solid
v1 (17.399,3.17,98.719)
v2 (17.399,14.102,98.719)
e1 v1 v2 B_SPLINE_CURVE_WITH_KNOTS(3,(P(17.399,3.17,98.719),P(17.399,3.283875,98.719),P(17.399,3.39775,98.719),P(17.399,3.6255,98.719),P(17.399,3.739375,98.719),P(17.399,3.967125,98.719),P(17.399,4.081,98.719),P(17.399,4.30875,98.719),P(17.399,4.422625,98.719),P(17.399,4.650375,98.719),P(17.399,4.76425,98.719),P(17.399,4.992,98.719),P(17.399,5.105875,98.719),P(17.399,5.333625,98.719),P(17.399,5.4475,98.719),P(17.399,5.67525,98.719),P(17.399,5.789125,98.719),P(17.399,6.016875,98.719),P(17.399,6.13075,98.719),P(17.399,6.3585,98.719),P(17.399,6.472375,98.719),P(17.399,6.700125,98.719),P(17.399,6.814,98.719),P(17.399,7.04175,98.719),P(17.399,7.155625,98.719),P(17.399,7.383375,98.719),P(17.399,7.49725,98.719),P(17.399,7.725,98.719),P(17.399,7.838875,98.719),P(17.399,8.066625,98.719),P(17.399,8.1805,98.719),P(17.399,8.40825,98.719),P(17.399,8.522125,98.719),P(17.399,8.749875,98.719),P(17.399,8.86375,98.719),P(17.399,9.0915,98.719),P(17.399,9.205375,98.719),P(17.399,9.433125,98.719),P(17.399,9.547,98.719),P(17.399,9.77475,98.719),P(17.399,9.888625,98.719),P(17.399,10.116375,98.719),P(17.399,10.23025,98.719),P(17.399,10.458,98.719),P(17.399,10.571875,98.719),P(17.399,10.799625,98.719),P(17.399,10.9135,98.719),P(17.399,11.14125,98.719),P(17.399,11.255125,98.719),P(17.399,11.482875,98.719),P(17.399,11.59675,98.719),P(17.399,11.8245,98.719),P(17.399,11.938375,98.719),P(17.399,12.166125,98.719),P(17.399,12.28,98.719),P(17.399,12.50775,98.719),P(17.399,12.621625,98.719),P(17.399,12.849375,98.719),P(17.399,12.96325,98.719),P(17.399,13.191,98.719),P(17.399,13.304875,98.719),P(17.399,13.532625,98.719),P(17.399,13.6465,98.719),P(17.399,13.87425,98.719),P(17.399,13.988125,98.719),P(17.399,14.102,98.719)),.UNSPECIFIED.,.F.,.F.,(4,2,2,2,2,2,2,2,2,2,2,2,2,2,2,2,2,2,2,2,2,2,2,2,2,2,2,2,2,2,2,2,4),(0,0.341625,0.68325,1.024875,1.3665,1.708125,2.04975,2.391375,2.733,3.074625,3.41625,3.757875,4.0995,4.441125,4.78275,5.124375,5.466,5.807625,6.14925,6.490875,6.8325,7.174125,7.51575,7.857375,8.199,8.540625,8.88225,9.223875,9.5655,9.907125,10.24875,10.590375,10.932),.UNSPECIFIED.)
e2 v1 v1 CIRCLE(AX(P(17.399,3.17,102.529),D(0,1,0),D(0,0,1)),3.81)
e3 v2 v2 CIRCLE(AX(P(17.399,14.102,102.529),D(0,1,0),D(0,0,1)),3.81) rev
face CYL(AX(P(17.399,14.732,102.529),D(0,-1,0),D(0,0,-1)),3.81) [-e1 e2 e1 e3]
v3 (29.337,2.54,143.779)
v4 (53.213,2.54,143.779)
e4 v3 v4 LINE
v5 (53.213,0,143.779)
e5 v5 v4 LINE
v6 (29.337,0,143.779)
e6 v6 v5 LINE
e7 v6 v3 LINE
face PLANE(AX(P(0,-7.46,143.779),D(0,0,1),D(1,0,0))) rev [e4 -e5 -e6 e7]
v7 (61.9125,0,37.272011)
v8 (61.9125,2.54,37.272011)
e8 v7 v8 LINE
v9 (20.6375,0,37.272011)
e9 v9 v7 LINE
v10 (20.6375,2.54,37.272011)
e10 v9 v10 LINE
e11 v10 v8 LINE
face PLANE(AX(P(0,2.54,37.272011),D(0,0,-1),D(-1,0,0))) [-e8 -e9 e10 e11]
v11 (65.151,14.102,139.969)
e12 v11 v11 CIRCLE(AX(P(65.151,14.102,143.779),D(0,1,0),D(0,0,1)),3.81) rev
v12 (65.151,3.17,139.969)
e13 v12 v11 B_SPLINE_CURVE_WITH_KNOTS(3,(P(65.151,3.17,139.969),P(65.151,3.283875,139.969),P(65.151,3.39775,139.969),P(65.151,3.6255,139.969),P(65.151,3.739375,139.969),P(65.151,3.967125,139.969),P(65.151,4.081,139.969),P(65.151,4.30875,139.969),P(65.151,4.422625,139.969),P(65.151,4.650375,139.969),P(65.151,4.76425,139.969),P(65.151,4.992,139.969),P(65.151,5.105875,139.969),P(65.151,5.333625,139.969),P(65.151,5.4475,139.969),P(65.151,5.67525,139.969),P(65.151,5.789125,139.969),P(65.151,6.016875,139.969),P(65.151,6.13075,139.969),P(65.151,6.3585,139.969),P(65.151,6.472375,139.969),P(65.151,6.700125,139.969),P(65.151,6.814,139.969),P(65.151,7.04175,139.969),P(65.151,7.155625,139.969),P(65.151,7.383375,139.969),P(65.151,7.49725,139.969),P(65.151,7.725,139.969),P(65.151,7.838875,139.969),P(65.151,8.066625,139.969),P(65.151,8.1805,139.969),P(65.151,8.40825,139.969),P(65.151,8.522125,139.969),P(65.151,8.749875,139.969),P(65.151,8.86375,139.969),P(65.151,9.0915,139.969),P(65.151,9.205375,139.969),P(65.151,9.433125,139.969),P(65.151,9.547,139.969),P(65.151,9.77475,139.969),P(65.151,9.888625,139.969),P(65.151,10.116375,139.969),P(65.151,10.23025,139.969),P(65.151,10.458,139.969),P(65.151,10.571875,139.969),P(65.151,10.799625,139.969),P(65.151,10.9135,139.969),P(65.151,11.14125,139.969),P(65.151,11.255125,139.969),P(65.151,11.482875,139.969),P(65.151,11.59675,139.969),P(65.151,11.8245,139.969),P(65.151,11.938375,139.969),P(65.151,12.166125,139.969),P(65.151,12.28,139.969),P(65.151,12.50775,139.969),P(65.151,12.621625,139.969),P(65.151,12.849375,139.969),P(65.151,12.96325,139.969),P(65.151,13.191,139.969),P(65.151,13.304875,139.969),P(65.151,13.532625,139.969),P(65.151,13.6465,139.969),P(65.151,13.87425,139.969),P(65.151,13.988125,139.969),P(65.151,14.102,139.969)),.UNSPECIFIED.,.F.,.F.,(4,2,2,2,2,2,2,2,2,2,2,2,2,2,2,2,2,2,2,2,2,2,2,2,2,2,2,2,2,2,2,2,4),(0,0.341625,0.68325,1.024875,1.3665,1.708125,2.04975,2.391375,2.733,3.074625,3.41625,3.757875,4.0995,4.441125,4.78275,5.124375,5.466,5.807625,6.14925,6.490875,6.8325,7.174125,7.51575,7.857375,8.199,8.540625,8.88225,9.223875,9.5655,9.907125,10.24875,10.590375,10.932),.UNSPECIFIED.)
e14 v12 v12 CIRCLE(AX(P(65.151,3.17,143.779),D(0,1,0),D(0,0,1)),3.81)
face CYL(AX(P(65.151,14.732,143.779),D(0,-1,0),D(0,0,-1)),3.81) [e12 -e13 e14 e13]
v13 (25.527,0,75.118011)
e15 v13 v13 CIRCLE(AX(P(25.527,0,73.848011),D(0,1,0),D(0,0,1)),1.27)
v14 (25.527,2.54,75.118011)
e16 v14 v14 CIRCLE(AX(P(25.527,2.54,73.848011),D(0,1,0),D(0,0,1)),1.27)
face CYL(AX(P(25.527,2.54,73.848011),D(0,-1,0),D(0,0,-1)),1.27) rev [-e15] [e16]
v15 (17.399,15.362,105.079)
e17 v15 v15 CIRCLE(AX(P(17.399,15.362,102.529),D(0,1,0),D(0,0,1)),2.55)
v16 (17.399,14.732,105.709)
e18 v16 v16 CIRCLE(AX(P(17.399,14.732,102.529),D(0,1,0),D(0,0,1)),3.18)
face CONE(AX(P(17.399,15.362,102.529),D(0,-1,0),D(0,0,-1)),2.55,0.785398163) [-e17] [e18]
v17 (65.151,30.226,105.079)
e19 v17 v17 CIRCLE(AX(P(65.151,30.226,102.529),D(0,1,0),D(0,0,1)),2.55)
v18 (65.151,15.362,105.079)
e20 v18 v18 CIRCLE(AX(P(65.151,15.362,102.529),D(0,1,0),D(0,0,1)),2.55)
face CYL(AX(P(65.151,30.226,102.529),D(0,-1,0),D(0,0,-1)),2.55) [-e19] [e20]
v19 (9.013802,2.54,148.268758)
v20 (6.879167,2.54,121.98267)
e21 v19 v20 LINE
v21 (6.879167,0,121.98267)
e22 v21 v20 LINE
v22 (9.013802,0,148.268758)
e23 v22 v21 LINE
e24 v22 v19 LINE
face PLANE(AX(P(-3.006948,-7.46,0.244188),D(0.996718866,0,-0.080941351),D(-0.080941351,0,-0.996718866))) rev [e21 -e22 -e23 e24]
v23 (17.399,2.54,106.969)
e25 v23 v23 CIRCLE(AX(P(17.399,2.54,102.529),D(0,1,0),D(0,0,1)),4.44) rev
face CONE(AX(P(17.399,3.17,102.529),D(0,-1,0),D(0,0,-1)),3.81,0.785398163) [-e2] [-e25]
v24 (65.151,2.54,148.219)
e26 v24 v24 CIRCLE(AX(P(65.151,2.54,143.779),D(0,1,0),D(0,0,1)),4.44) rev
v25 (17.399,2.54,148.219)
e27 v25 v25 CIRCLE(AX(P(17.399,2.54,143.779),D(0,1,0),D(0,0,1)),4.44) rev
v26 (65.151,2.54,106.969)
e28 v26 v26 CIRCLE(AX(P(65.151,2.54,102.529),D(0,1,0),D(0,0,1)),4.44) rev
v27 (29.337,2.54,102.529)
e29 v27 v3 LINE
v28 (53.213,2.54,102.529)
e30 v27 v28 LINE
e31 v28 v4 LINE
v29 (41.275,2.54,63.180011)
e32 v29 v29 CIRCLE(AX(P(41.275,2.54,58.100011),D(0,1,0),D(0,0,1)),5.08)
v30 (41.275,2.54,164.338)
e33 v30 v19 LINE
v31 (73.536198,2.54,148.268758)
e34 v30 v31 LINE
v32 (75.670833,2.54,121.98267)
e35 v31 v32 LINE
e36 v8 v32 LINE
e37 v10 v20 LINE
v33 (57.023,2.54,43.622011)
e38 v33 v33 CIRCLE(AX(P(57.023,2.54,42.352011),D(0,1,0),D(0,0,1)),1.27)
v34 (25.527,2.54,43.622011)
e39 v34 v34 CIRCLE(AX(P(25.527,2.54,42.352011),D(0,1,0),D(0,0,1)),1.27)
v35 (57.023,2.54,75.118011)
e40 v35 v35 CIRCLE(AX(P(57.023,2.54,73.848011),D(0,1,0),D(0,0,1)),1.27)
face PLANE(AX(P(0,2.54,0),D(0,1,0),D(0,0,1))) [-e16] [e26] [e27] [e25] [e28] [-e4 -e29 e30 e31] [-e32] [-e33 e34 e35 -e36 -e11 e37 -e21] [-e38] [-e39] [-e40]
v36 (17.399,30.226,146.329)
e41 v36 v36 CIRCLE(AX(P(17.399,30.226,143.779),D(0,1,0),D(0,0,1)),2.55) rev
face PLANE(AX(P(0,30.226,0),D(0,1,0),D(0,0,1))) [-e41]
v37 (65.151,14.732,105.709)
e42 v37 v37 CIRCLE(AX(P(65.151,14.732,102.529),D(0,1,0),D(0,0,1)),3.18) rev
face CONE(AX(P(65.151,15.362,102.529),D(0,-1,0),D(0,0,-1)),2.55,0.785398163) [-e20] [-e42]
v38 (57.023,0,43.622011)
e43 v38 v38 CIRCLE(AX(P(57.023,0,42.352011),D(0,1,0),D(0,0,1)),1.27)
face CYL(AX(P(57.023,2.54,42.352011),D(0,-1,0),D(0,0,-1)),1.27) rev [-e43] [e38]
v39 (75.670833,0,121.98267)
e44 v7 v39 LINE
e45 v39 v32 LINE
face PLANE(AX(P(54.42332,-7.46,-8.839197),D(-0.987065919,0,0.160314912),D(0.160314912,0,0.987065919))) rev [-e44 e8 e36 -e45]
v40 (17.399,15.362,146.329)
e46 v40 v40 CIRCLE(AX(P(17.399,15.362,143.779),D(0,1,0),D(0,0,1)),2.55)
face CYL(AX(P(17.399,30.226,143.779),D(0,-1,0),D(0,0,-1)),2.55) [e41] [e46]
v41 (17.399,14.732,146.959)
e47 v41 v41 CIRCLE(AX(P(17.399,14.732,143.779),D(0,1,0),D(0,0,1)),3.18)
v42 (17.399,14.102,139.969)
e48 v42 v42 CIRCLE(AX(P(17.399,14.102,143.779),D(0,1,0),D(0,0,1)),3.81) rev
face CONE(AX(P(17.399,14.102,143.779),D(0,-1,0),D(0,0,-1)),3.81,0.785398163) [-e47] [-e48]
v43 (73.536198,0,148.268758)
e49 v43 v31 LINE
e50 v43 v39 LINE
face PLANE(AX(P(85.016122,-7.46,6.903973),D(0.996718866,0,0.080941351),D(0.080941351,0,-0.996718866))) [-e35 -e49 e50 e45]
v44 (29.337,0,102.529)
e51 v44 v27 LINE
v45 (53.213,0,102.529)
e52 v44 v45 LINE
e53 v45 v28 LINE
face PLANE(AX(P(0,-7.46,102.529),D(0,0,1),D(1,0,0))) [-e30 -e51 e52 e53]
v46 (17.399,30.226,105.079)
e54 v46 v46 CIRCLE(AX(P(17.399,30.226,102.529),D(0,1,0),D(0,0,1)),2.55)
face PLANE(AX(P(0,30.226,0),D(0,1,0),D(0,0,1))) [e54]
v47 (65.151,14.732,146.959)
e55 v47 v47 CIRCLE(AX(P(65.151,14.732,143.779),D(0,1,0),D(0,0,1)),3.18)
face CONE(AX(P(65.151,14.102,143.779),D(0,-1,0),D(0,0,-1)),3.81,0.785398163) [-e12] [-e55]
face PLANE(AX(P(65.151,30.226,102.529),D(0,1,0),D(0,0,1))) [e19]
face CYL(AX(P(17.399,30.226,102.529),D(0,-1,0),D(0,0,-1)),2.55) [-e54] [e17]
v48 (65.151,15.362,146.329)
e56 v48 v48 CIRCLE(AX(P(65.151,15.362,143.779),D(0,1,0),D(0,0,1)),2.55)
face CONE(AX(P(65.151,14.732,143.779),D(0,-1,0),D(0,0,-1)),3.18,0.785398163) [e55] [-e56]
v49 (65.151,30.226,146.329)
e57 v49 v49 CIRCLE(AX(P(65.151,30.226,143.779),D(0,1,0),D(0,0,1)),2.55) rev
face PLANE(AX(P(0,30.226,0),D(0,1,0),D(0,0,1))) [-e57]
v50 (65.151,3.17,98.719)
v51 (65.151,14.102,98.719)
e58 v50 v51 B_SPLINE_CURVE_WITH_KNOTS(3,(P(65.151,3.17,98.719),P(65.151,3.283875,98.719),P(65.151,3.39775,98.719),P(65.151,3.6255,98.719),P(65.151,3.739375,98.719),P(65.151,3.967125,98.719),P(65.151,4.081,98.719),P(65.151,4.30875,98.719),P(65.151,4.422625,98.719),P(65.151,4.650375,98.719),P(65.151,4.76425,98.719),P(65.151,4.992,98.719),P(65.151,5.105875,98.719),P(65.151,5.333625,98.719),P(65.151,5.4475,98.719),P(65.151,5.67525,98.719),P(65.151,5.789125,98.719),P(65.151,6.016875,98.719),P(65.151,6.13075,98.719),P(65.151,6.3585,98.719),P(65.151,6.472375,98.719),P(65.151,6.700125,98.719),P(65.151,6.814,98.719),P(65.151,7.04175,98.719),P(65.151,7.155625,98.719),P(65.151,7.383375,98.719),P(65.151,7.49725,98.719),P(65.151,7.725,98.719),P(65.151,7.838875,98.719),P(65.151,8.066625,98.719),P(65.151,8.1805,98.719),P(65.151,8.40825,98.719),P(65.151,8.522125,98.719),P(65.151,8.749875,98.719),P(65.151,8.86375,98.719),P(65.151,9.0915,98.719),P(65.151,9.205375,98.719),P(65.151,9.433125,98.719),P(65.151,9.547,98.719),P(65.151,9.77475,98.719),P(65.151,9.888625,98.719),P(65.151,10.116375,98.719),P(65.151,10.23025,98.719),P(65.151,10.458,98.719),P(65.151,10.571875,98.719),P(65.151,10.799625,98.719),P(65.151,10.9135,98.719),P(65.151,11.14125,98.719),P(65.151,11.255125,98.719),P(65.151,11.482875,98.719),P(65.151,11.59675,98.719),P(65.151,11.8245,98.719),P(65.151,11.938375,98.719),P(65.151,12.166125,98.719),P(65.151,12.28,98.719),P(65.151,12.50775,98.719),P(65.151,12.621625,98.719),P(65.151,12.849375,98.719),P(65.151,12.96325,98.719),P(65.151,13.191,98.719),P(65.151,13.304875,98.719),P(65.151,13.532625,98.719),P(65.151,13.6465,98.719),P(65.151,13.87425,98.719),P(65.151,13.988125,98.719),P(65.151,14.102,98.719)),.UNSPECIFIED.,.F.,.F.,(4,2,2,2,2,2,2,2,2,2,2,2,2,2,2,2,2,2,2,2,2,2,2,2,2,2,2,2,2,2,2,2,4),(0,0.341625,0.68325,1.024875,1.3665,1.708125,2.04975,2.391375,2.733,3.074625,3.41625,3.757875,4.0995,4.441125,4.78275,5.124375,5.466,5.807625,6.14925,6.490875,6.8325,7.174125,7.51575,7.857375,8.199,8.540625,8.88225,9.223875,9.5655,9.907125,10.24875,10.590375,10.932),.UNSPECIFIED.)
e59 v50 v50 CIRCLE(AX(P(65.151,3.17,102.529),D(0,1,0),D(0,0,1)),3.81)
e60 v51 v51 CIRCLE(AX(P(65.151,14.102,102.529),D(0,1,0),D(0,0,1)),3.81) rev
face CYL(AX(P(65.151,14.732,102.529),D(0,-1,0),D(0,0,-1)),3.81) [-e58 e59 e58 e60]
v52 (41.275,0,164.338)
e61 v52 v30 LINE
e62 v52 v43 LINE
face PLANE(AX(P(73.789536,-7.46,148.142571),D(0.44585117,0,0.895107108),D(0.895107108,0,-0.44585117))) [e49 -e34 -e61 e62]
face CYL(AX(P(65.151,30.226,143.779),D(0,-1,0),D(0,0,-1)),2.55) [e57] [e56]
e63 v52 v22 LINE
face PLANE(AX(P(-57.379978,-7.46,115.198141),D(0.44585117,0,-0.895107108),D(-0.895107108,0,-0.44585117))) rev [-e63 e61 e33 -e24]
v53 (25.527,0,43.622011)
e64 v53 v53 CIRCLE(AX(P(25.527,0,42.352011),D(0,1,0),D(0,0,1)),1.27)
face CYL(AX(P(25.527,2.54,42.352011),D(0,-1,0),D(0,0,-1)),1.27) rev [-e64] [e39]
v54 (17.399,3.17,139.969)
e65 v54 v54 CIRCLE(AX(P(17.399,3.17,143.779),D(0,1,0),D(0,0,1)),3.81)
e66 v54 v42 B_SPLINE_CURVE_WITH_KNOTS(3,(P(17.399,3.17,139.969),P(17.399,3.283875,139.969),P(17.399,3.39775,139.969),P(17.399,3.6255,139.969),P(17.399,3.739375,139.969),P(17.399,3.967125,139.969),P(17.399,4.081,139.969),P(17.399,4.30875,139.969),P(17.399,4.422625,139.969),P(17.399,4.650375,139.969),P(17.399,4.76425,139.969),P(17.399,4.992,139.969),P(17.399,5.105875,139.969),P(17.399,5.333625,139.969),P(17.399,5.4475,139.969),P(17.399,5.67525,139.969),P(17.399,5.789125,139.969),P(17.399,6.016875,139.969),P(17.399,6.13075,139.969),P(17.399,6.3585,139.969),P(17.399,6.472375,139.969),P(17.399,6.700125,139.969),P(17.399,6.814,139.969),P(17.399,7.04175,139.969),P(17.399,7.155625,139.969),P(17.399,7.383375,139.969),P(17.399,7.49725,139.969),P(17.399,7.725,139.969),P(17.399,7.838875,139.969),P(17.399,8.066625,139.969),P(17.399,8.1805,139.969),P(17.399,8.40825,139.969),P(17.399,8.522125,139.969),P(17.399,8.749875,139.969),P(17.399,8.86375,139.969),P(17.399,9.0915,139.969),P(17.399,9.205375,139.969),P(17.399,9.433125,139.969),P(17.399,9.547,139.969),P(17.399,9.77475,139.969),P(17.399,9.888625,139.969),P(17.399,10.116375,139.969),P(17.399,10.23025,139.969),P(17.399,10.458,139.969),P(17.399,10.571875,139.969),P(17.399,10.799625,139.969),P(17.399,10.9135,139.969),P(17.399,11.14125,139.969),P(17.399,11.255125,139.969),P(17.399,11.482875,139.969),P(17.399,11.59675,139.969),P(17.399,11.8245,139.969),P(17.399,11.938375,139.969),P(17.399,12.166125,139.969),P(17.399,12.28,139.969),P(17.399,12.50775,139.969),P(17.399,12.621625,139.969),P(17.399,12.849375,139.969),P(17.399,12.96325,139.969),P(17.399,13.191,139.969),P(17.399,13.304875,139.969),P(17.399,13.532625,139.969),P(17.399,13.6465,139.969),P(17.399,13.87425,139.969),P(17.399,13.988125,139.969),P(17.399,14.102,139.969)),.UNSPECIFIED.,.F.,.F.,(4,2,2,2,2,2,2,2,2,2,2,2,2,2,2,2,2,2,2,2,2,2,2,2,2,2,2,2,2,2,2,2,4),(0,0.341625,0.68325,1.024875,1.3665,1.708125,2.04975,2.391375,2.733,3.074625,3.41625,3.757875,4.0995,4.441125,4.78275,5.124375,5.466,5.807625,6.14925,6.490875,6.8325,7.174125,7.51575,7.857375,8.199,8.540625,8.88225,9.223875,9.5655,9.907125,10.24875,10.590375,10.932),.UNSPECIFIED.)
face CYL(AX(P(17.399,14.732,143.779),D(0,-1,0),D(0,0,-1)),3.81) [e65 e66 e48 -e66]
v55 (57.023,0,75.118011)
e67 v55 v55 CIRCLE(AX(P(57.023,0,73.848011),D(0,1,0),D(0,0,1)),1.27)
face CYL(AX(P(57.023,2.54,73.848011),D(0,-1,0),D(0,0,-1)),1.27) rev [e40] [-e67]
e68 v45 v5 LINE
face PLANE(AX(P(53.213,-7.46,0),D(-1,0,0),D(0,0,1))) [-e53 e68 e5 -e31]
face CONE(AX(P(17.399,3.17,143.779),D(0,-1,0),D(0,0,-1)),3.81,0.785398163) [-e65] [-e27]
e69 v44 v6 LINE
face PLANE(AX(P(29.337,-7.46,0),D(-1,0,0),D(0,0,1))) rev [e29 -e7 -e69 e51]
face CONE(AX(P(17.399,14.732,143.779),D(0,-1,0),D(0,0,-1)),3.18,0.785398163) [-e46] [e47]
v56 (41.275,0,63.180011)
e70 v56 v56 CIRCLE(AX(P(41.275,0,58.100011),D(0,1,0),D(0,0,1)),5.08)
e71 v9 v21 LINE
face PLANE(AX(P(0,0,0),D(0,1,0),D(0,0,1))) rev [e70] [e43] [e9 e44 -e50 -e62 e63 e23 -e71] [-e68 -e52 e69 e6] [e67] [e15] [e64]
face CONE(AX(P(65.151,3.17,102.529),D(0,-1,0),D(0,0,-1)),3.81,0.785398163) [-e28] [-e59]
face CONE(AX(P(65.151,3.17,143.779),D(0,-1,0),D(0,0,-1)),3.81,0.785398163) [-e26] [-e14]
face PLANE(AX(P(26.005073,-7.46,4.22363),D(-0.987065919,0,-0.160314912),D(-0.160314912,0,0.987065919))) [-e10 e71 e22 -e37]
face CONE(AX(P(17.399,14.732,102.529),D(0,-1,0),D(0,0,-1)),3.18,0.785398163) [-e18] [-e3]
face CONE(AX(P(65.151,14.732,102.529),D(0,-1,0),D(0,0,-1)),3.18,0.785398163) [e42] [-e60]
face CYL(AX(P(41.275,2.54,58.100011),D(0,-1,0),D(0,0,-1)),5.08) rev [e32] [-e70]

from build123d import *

# Parameters (mm, degrees)
SKETCH1_W           = 82.55
SKETCH1_H           = 127.0659892
SKETCH1_R           = 5.08
SKETCH1_R_2         = 1.27
BASE_EXTRUDE_DEPTH  = 2.54
SKETCH7_R           = 2.55
BOSS_EXTRUDE6_DEPTH = 27.686
SKETCH7_3_R         = 3.81
BOSS_EXTRUDE7_DEPTH = 12.192
CHAMFER1_SIZE       = 0.63
CHAMFER2_SIZE       = 0.63
CHAMFER3_SIZE       = 0.63
CHAMFER4_SIZE       = 0.63
SKETCH8_W           = 23.876
SKETCH8_H           = 41.25
CUT_EXTRUDE1_DEPTH  = 10


with BuildPart() as part:
    # Sketch1 → base extrude (new body)
    with BuildSketch(Plane(origin=(0, 0, 0), x_dir=(1, 0, 0), z_dir=(0, 1, 0))):
        with Locations((41.275, -100.8050054)):
            Rectangle(SKETCH1_W, SKETCH1_H)
        with Locations(Location((41.275, -58.1000108, 0), (0, 0, 270))):
            Circle(SKETCH1_R, mode=Mode.SUBTRACT)
        with Locations(Location((25.527, -42.3520108, 0), (0, 0, 270))):
            Circle(SKETCH1_R_2, mode=Mode.SUBTRACT)
        with Locations(Location((57.023, -42.3520108, 0), (0, 0, 270))):
            Circle(SKETCH1_R_2, mode=Mode.SUBTRACT)
        with Locations(Location((57.023, -73.8480108, 0), (0, 0, 270))):
            Circle(SKETCH1_R_2, mode=Mode.SUBTRACT)
        with Locations(Location((25.527, -73.8480108, 0), (0, 0, 270))):
            Circle(SKETCH1_R_2, mode=Mode.SUBTRACT)
    extrude(amount=BASE_EXTRUDE_DEPTH)

    # Sketch7 → Boss-Extrude6 (add)
    with BuildSketch(Plane(origin=(0, 2.54, 0), x_dir=(1, 0, 0), z_dir=(0, 1, 0))):
        with Locations(Location((65.151, -102.529, 0), (0, 0, 270))):
            Circle(SKETCH7_R)
        with Locations(Location((17.399, -102.529, 0), (0, 0, 270))):
            Circle(SKETCH7_R)
        with Locations(Location((65.151, -143.779, 0), (0, 0, 270))):
            Circle(SKETCH7_R)
        with Locations(Location((17.399, -143.779, 0), (0, 0, 270))):
            Circle(SKETCH7_R)
    extrude(amount=BOSS_EXTRUDE6_DEPTH)

    # Sketch7<3> → Boss-Extrude7 (add)
    with BuildSketch(Plane(origin=(0, 2.54, 0), x_dir=(1, 0, 0), z_dir=(0, 1, 0))):
        with Locations(Location((65.151, -102.529, 0), (0, 0, 90))):
            Circle(SKETCH7_3_R)
        with Locations(Location((17.399, -102.529, 0), (0, 0, 90))):
            Circle(SKETCH7_3_R)
        with Locations(Location((65.151, -143.779, 0), (0, 0, 90))):
            Circle(SKETCH7_3_R)
        with Locations(Location((17.399, -143.779, 0), (0, 0, 90))):
            Circle(SKETCH7_3_R)
    extrude(amount=BOSS_EXTRUDE7_DEPTH)

    # Chamfer1
    chamfer1_edges = [part.edges().sort_by_distance(p)[0] for p in [
        (65.151, 14.732, 99.979),
        (65.151, 2.54, 106.339),
        (65.151, 14.732, 106.339),
    ]]
    chamfer(chamfer1_edges, length=CHAMFER1_SIZE - 0.0001)  # a hair under: the kernel refuses the full size

    # Chamfer2
    chamfer2_edges = [part.edges().sort_by_distance(p)[0] for p in [
        (17.399, 14.732, 99.979),
        (17.399, 2.54, 106.339),
        (17.399, 14.732, 106.339),
    ]]
    chamfer(chamfer2_edges, length=CHAMFER2_SIZE - 0.0001)  # a hair under: the kernel refuses the full size

    # Chamfer3
    chamfer3_edges = [part.edges().sort_by_distance(p)[0] for p in [
        (65.151, 14.732, 141.229),
        (65.151, 2.54, 147.589),
        (65.151, 14.732, 147.589),
    ]]
    chamfer(chamfer3_edges, length=CHAMFER3_SIZE - 0.0001)  # a hair under: the kernel refuses the full size

    # Chamfer4
    chamfer4_edges = [part.edges().sort_by_distance(p)[0] for p in [
        (17.399, 14.732, 141.229),
        (17.399, 2.54, 147.589),
        (17.399, 14.732, 147.589),
    ]]
    chamfer(chamfer4_edges, length=CHAMFER4_SIZE - 0.0001)  # a hair under: the kernel refuses the full size

    # Sketch8 → Cut-Extrude1 (cut)
    with BuildSketch(Plane(origin=(0, 2.54, 0), x_dir=(1, 0, 0), z_dir=(0, 1, 0))):
        Polygon((82.55, -37.2720108), (61.9125, -37.2720108), (75.670833333, -121.982670267), (73.536197868, -148.268757917), (41.275, -164.338), (82.55, -164.338), align=None)
        Polygon((6.879166667, -121.982670267), (20.6375, -37.2720108), (0, -37.2720108), (0, -164.338), (41.275, -164.338), (9.013802132, -148.268757917), align=None)
        with Locations((41.275, -123.154)):
            Rectangle(SKETCH8_W, SKETCH8_H)
    extrude(amount=-CUT_EXTRUDE1_DEPTH, mode=Mode.SUBTRACT)


solid = part.part
